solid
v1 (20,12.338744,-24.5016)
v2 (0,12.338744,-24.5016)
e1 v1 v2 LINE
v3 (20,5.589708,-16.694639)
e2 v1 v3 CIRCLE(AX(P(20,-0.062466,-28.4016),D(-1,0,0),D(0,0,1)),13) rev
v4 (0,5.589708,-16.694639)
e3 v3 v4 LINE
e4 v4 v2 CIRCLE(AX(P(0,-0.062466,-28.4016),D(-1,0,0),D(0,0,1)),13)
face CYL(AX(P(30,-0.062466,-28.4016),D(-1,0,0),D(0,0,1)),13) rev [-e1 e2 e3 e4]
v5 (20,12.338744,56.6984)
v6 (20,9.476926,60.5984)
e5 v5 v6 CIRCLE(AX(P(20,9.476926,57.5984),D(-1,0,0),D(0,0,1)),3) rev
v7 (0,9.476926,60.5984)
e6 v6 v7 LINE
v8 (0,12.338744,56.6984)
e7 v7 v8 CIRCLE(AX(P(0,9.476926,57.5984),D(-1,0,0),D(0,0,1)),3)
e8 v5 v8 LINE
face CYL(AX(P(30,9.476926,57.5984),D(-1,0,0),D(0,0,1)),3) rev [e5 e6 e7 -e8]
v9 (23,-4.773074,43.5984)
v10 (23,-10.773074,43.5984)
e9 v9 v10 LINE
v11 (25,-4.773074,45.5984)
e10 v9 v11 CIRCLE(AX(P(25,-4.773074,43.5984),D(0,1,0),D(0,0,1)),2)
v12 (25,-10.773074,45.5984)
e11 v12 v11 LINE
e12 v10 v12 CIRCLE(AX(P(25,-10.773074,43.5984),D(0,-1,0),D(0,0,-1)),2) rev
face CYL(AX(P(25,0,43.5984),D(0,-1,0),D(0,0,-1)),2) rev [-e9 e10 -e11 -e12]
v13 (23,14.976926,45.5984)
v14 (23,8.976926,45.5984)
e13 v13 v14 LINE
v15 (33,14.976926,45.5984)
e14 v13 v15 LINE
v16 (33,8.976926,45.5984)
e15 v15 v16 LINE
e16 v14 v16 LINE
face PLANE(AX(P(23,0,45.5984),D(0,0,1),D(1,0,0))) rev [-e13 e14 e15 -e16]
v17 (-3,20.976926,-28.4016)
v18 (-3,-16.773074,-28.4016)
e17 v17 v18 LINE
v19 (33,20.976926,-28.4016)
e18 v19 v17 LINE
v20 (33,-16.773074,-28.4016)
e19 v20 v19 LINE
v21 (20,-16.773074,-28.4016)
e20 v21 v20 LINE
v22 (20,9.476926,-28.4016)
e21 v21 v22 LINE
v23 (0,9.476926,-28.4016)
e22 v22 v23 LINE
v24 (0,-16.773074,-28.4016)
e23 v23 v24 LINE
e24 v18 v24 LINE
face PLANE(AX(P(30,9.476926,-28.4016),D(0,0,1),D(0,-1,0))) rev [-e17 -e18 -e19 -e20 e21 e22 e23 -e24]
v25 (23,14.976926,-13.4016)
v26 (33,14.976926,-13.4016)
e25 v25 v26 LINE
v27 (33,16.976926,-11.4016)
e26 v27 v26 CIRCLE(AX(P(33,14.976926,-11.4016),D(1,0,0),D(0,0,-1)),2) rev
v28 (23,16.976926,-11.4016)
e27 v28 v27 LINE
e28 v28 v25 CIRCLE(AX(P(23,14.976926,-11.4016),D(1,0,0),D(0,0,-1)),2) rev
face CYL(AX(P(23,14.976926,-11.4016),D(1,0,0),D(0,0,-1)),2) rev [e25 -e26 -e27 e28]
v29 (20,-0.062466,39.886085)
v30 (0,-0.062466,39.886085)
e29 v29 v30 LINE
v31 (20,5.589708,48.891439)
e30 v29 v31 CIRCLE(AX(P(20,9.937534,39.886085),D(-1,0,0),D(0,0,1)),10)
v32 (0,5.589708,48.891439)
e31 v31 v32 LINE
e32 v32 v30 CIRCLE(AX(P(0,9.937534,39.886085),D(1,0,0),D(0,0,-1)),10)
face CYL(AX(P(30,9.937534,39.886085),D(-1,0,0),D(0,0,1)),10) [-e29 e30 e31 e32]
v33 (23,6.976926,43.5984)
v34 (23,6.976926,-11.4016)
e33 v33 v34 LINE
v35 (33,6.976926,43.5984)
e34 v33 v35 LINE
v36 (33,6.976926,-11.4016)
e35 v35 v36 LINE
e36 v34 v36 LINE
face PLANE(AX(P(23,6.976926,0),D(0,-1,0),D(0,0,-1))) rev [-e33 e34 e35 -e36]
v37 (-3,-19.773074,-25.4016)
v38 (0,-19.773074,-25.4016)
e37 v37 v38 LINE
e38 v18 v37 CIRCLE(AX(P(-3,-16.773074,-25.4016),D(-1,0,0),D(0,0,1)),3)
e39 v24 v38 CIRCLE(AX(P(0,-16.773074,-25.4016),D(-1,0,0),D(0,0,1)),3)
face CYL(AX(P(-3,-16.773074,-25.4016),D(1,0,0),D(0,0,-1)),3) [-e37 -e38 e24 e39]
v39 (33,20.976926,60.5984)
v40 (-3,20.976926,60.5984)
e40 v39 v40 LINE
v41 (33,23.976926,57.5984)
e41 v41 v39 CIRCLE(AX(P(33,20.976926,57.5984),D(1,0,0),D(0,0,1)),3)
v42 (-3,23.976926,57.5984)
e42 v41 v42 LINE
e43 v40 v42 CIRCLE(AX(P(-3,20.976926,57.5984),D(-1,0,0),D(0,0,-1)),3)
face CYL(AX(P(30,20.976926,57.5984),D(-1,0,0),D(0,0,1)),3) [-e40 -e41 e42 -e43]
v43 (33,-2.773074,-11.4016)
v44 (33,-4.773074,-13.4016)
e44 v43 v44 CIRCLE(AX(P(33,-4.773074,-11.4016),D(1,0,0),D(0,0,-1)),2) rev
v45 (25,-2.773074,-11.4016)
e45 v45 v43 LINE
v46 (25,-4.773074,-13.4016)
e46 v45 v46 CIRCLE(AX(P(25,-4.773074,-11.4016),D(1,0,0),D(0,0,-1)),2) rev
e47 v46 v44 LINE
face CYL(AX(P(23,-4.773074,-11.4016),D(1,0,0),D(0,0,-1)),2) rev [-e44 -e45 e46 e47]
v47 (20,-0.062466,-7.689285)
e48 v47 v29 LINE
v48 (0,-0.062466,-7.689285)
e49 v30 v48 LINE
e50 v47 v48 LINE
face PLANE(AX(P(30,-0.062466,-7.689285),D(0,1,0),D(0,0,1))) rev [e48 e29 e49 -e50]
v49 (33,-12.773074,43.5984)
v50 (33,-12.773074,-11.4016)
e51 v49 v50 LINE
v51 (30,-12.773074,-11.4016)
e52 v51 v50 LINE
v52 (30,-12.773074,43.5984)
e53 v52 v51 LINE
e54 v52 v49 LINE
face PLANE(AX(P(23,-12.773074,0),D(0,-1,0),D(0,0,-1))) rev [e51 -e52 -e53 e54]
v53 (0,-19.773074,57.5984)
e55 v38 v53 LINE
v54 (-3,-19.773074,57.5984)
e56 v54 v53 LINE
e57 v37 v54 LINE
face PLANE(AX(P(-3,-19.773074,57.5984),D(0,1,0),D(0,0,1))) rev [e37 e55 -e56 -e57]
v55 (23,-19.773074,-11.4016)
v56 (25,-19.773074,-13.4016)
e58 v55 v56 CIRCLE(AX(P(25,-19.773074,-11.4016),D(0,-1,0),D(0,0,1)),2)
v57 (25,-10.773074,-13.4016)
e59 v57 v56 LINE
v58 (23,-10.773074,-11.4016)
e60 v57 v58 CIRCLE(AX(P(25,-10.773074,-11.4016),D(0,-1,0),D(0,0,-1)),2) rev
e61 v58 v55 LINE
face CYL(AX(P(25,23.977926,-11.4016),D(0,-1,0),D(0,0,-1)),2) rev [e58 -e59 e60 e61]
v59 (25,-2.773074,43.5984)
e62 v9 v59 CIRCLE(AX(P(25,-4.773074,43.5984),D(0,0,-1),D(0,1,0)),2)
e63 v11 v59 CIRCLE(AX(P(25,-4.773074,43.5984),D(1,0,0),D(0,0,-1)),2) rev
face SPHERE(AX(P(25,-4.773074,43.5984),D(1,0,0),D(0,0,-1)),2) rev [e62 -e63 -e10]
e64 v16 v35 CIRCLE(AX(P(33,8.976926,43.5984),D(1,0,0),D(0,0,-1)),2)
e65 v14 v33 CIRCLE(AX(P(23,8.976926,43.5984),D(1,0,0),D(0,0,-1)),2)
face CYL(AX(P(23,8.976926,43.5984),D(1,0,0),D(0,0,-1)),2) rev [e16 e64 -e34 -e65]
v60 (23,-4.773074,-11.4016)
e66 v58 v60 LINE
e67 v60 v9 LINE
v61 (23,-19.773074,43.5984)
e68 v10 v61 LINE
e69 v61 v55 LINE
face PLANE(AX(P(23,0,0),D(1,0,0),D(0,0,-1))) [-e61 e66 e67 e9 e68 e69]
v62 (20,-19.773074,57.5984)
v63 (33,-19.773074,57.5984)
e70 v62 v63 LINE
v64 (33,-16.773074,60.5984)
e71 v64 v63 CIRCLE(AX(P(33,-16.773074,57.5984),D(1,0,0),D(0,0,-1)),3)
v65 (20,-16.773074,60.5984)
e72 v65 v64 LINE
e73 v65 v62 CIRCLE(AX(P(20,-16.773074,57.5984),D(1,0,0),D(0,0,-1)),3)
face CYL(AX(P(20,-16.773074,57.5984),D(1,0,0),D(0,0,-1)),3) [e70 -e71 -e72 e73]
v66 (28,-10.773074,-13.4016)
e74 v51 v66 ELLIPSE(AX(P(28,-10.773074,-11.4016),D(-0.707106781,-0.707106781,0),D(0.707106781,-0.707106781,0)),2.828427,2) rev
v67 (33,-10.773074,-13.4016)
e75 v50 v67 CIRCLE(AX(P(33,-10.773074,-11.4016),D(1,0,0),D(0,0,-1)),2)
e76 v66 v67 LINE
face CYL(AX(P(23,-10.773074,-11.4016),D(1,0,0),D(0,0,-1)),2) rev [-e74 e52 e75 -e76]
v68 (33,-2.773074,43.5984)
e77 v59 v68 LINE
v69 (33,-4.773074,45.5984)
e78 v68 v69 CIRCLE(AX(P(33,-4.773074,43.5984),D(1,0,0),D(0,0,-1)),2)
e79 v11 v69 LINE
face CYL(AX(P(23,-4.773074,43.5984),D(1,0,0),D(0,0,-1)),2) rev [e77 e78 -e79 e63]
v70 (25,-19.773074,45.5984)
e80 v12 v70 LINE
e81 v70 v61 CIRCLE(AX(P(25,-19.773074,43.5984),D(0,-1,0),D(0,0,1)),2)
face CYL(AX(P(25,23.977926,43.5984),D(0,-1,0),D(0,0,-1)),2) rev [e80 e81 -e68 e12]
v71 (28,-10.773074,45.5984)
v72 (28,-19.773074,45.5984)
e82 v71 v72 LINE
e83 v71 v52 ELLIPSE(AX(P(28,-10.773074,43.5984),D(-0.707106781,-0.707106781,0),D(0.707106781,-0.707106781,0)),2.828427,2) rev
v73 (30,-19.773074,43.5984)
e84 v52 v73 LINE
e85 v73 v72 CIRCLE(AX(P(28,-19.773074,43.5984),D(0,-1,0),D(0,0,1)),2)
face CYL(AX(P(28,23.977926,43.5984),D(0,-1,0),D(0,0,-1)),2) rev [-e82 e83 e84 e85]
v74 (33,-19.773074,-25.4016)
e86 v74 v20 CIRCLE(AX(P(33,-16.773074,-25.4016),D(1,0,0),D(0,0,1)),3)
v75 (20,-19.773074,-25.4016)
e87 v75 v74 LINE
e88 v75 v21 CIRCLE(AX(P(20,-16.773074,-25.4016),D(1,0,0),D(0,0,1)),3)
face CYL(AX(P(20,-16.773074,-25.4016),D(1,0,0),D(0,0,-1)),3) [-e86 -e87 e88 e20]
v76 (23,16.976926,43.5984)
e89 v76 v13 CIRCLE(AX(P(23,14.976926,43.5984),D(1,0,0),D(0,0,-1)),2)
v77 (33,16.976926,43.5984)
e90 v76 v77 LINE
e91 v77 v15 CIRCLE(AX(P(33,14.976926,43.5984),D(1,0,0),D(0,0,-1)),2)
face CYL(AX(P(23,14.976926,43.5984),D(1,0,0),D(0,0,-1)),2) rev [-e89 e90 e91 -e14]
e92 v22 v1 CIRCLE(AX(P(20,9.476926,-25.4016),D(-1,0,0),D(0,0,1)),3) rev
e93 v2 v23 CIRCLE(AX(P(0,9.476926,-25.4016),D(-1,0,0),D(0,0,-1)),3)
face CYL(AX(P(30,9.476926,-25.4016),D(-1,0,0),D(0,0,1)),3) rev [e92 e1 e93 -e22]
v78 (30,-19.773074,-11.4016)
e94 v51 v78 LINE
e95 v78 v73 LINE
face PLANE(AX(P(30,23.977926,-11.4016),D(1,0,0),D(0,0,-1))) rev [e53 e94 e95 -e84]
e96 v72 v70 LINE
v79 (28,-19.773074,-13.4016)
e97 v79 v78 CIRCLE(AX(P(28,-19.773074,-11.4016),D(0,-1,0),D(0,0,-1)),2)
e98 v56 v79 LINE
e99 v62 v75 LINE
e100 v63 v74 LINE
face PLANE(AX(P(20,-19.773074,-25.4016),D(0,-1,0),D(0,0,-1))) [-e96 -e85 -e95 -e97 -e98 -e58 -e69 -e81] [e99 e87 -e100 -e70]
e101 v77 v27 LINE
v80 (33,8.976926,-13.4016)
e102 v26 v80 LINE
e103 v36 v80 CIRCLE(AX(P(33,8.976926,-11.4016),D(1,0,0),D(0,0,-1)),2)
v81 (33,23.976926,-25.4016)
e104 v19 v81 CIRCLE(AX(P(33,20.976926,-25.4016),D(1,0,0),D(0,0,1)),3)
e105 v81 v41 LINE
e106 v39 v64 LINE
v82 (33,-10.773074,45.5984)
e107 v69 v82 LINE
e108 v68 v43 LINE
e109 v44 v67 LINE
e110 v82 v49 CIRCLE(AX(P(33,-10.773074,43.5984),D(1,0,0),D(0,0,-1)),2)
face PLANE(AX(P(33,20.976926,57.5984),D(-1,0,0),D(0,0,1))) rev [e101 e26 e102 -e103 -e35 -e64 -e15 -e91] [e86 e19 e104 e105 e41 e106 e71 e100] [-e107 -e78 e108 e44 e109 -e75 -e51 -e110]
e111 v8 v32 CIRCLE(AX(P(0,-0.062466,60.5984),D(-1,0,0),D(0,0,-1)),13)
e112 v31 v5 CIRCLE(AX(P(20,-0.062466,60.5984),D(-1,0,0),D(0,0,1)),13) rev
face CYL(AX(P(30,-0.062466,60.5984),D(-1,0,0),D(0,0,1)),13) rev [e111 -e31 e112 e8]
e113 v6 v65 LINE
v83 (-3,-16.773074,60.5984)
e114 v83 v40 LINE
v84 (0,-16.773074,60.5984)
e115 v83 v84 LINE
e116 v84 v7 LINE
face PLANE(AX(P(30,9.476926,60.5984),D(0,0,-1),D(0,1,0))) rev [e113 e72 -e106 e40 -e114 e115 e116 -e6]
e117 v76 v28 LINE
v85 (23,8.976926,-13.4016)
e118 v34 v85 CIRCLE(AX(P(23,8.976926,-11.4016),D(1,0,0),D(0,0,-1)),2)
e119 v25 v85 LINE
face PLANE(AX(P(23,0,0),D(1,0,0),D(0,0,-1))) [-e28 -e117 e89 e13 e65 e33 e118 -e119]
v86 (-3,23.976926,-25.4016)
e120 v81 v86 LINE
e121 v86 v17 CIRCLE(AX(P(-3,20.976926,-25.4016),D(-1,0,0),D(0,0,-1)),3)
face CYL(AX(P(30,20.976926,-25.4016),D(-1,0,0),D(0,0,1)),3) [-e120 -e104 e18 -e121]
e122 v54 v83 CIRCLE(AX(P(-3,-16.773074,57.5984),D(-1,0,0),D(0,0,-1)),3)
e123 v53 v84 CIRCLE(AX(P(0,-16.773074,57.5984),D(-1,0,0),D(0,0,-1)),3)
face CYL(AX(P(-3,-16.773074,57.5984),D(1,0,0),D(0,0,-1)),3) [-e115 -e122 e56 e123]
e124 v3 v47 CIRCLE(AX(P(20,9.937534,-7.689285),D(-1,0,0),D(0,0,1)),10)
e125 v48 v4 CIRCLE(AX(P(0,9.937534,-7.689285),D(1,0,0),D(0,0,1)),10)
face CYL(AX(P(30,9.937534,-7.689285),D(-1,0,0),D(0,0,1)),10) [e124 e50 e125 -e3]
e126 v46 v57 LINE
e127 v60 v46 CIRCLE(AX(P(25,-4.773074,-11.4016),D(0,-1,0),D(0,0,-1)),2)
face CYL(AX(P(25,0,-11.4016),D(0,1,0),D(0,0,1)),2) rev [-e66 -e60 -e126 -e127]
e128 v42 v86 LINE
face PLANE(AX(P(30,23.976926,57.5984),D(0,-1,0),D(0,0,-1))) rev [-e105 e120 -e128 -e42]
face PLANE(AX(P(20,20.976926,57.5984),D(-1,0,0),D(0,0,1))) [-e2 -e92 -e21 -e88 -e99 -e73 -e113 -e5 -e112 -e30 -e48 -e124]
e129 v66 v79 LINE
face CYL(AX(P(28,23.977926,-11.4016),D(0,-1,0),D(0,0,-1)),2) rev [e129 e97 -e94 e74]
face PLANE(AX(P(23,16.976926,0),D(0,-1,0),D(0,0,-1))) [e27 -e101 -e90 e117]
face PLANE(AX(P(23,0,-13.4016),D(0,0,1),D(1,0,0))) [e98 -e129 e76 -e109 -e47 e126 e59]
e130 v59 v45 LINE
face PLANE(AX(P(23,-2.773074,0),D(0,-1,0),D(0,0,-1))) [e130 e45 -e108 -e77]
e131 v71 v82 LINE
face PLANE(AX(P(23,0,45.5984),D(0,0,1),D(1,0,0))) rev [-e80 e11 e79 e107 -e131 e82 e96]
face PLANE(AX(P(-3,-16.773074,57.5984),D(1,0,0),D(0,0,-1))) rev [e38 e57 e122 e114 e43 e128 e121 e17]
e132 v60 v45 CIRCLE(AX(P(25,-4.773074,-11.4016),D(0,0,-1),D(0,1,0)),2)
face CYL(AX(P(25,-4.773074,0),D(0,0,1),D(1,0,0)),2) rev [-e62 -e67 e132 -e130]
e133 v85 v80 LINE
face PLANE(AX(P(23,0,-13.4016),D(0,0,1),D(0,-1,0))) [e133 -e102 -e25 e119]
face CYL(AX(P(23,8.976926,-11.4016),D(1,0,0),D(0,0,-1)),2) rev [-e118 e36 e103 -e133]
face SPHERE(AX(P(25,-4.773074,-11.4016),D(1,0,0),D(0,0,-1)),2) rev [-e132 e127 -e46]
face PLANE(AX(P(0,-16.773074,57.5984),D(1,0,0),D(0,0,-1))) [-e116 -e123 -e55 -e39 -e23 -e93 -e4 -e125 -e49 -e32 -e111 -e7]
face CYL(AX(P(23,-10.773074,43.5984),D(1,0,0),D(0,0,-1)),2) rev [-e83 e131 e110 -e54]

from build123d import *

# Parameters (mm, degrees)
RESSALTO_EXTRUS_O2_DEPTH      = 30
RESSALTO_EXTRUS_O3_START      = 3
RESSALTO_EXTRUS_O3_DEPTH      = 3
RESSALTO_EXTRUS_O4_DEPTH      = 3
RESSALTO_EXTRUS_O4_DEPTH_BACK = 10
CORTE_EXTRUS_O1_DEPTH         = 10.000000000000002
CORTE_EXTRUS_O2_REACH         = 83.702
FILETE1_R                     = 2


with BuildPart() as part:
    # Esboço2 → Ressalto-extrusão2 (new body)
    with BuildSketch(Plane(origin=(0, 0, 0), x_dir=(0, 0, -1), z_dir=(1, 0, 0))):
        with BuildLine():
            Line((2.901599919865161, -0.06246593766177921), (-35.09840008013481, -0.06246593766176534))
            Line((-35.09840008013481, -0.06246593766176534), (-39.886084902926825, -0.06246593766177921))
            ThreePointArc((-39.886084902926825, -0.06246593766177921), (-45.20218023363878, 1.4676385237390175), (-48.891439327799866, 5.589707975381692))
            ThreePointArc((-48.891439327799866, 5.589707975381692), (-52.09653694789475, 9.772081498832542), (-56.69840008013493, 12.338743680758546))
            ThreePointArc((-56.69840008013493, 12.338743680758546), (-59.37322401506481, 11.895603400997262), (-60.5984000801349, 9.476926076507686))
            Line((-60.5984000801349, 9.476926076507686), (-60.598400080134894, 20.976926076507663))
            ThreePointArc((-60.598400080134894, 20.976926076507663), (-59.71972042369454, 23.098246420067323), (-57.59840008013488, 23.976926076507684))
            Line((-57.59840008013488, 23.976926076507684), (25.401599919865156, 23.976926076507684))
            ThreePointArc((25.401599919865156, 23.976926076507684), (27.522920263424812, 23.098246420067333), (28.401599919865177, 20.976926076507684))
            Line((28.401599919865177, 20.976926076507684), (28.40159991986526, 9.476926076507686))
            ThreePointArc((28.40159991986526, 9.476926076507686), (27.176423854795164, 11.895603400997262), (24.50159991986529, 12.338743680758546))
            ThreePointArc((24.50159991986529, 12.338743680758546), (19.8997367876251, 9.772081498832549), (16.69463916753021, 5.589707975381692))
            ThreePointArc((16.69463916753021, 5.589707975381692), (13.005380073369123, 1.467638523739021), (7.689284742657176, -0.06246593766177921))
            Line((7.689284742657176, -0.06246593766177921), (2.901599919865161, -0.06246593766177921))
        make_face()
    extrude(amount=RESSALTO_EXTRUS_O2_DEPTH)

    # Esboço3 → Ressalto-extrusão3 (add)
    with BuildSketch(Plane.ZY.offset(RESSALTO_EXTRUS_O3_START)):
        with BuildLine():
            Line((60.598400080134894, 15.226926076507677), (60.59840008013489, 20.976926076507663))
            ThreePointArc((60.59840008013489, 20.976926076507663), (59.71972042369454, 23.098246420067326), (57.59840008013487, 23.976926076507684))
            Line((57.59840008013487, 23.976926076507684), (16.09840008013486, 23.976926076507684))
            Line((16.09840008013486, 23.976926076507684), (-25.4015999198652, 23.976926076507684))
            ThreePointArc((-25.4015999198652, 23.976926076507684), (-27.52292026342486, 23.098246420067326), (-28.40159991986522, 20.976926076507663))
            Line((-28.40159991986522, 20.976926076507663), (-28.40159991986522, 15.226926076507686))
            Line((-28.40159991986522, 15.226926076507686), (-28.40159991986525, -16.773073923492294))
            ThreePointArc((-28.40159991986525, -16.773073923492294), (-27.522920263424897, -18.894394267051958), (-25.401599919865234, -19.77307392349232))
            Line((-25.401599919865234, -19.77307392349232), (57.59840008013488, -19.773073923492326))
            ThreePointArc((57.59840008013488, -19.773073923492326), (59.71972042369455, -18.89439426705197), (60.5984000801349, -16.7730739234923))
            Line((60.5984000801349, -16.7730739234923), (60.598400080134894, 15.226926076507677))
        make_face()
    extrude(amount=-RESSALTO_EXTRUS_O3_DEPTH)

    # Esboço4 → Ressalto-extrusão4 (add, two sides: drawn at the far end of the back side and taken through both)
    with BuildSketch(Plane(origin=(30, 0, 0), x_dir=(0, 0, -1), z_dir=(1, 0, 0)).offset(-RESSALTO_EXTRUS_O4_DEPTH_BACK)):
        with BuildLine():
            Line((-16.09840008013486, 23.976926076507684), (25.4015999198652, 23.976926076507684))
            ThreePointArc((25.4015999198652, 23.976926076507684), (27.52292026342486, 23.098246420067326), (28.40159991986522, 20.976926076507663))
            Line((28.40159991986522, 20.976926076507663), (28.40159991986522, 15.226926076507686))
            Line((28.40159991986522, 15.226926076507686), (28.40159991986523, -16.773073923492294))
            ThreePointArc((28.40159991986523, -16.773073923492294), (27.522920263424872, -18.89439426705196), (25.401599919865205, -19.77307392349232))
            Line((25.401599919865205, -19.77307392349232), (-57.598400080134866, -19.773073923492326))
            ThreePointArc((-57.598400080134866, -19.773073923492326), (-59.71972042369453, -18.89439426705197), (-60.59840008013489, -16.773073923492305))
            Line((-60.59840008013489, -16.773073923492305), (-60.598400080134894, 15.226926076507677))
            Line((-60.598400080134894, 15.226926076507677), (-60.598400080134894, 20.976926076507663))
            ThreePointArc((-60.598400080134894, 20.976926076507663), (-59.71972042369454, 23.098246420067326), (-57.59840008013487, 23.976926076507684))
            Line((-57.59840008013487, 23.976926076507684), (-16.09840008013486, 23.976926076507684))
        make_face()
    extrude(amount=RESSALTO_EXTRUS_O4_DEPTH + RESSALTO_EXTRUS_O4_DEPTH_BACK)

    # Esboço8 → Corte-extrusão1 (cut)
    with BuildSketch(Plane(origin=(33, 0, 0), x_dir=(0, 0, -1), z_dir=(1, 0, 0))):
        with BuildLine():
            Line((-43.59840008013488, -2.7730739234923267), (11.401599919865212, -2.7730739234923267))
            ThreePointArc((11.401599919865212, -2.7730739234923267), (12.815813482238323, -3.3588603611192323), (13.401599919865227, -4.7730739234923405))
            Line((13.401599919865227, -4.7730739234923405), (13.401599919865227, -10.773073923492314))
            ThreePointArc((13.401599919865227, -10.773073923492314), (12.81581348223832, -12.187287485865422), (11.401599919865212, -12.773073923492326))
            Line((11.401599919865212, -12.773073923492326), (-43.59840008013488, -12.773073923492326))
            ThreePointArc((-43.59840008013488, -12.773073923492326), (-45.012613642507986, -12.187287485865422), (-45.598400080134894, -10.773073923492314))
            Line((-45.598400080134894, -10.773073923492314), (-45.598400080134894, -4.7730739234923405))
            ThreePointArc((-45.598400080134894, -4.7730739234923405), (-45.012613642507986, -3.358860361119232), (-43.59840008013488, -2.7730739234923267))
        make_face()
        with BuildLine():
            Line((-43.59840008013488, 6.976926076507685), (11.401599919865218, 6.976926076507685))
            ThreePointArc((11.401599919865218, 6.976926076507685), (12.815813482238326, 7.56271251413459), (13.401599919865228, 8.976926076507699))
            Line((13.401599919865228, 8.976926076507699), (13.401599919865227, 14.976926076507674))
            ThreePointArc((13.401599919865227, 14.976926076507674), (12.81581348223832, 16.39113963888078), (11.401599919865214, 16.976926076507684))
            Line((11.401599919865214, 16.976926076507684), (-43.59840008013488, 16.976926076507684))
            ThreePointArc((-43.59840008013488, 16.976926076507684), (-45.012613642507986, 16.39113963888078), (-45.598400080134894, 14.976926076507672))
            Line((-45.598400080134894, 14.976926076507672), (-45.598400080134894, 8.976926076507699))
            ThreePointArc((-45.598400080134894, 8.976926076507699), (-45.012613642507986, 7.5627125141345894), (-43.59840008013488, 6.976926076507685))
        make_face()
    extrude(amount=-CORTE_EXTRUS_O1_DEPTH, mode=Mode.SUBTRACT)

    # Esboço9 → Corte-extrusão2 (cut, up to next)
    with BuildSketch(Plane(origin=(0, -19.773073923492323, -1.65e-15), x_dir=(-1, 0, 0), z_dir=(0, -1, -8e-17)), mode=Mode.PRIVATE) as corte_extrus_o2_sk1:
        with BuildLine():
            Line((-25.000000000000007, 13.401599919865228), (-27.99999999999999, 13.401599919865228))
            ThreePointArc((-27.99999999999999, 13.401599919865228), (-29.414213562373096, 12.815813482238323), (-30.000000000000004, 11.401599919865216))
            Line((-30.000000000000004, 11.401599919865216), (-29.999999999999996, -43.59840008013487))
            ThreePointArc((-29.999999999999996, -43.59840008013487), (-29.414213562373092, -45.01261364250798), (-27.999999999999982, -45.59840008013489))
            Line((-27.999999999999982, -45.59840008013489), (-25, -45.59840008013489))
            ThreePointArc((-25, -45.59840008013489), (-23.585786437626894, -45.01261364250798), (-22.99999999999999, -43.59840008013487))
            Line((-22.99999999999999, -43.59840008013487), (-22.999999999999996, 11.401599919865216))
            ThreePointArc((-22.999999999999996, 11.401599919865216), (-23.585786437626897, 12.815813482238324), (-25.000000000000007, 13.401599919865228))
        make_face()
    corte_extrus_o2_tool1 = extrude(corte_extrus_o2_sk1.sketch, amount=-CORTE_EXTRUS_O2_REACH, mode=Mode.PRIVATE) & part.part
    add(corte_extrus_o2_tool1.solids().sort_by_distance((26.5, -19.773074, 16.0984))[0], mode=Mode.SUBTRACT)

    # Filete1
    # the kernel refuses this fillet: 2 mm, written as the material it adds along each edge
    with BuildSketch(Plane(origin=(22.99999999999999, -15.773073923492316, 45.59840008013489), x_dir=(0, 0, -1), z_dir=(0, 1, 0))) as filete1_piece_1:
        with BuildLine():
            CenterArc((FILETE1_R, -FILETE1_R), FILETE1_R, 90, 90)
            Line((0, -FILETE1_R), (0, 0))
            Line((0, 0), (FILETE1_R, 0))
        make_face()
    extrude(amount=10.999999999999973)
    with BuildSketch(Plane(origin=(23, -4.773073923492332, 43.59840008013489), x_dir=(0, -4.44e-15, 1), z_dir=(0, -1, -4.44e-15))) as filete1_piece_2:
        with BuildLine():
            CenterArc((2.000000000000007 - FILETE1_R, -FILETE1_R), FILETE1_R, 359.9999999999997, 90.00000000000028)
            Line((2.000000000000007, -FILETE1_R), (2.000000000000007, 0))
            Line((2.000000000000007, 0), (2.000000000000007 - FILETE1_R, 1.066e-14))
        make_face()
    revolve(axis=Axis((23, -4.773073923492332, 43.59840008013489), (-1, 0, 0)), revolution_arc=90.00000000000045)
    with BuildSketch(Plane(origin=(23, -2.7730739234923267, 43.59840008013488), x_dir=(-5.33e-15, -1, 0), z_dir=(0, 0, -1))) as filete1_piece_3:
        with BuildLine():
            CenterArc((FILETE1_R, -FILETE1_R), FILETE1_R, 89.99999999999969, 90.00000000000031)
            Line((-1.11e-14, -FILETE1_R), (0, 0))
            Line((0, 0), (FILETE1_R, 0))
        make_face()
    extrude(amount=55.00000000000009)
    with BuildSketch(Plane(origin=(23, -4.773073923492328, -11.401599919865227), x_dir=(0, 1, 7.11e-15), z_dir=(0, -7.11e-15, 1))) as filete1_piece_4:
        with BuildLine():
            CenterArc((2.0000000000000004 - FILETE1_R, -FILETE1_R), FILETE1_R, 359.9999999999999, 90.00000000000011)
            Line((2.0000000000000018, -FILETE1_R), (2.0000000000000004, 0))
            Line((2.0000000000000004, 0), (2.0000000000000004 - FILETE1_R, 3.55e-15))
        make_face()
    revolve(axis=Axis((23, -4.773073923492328, -11.401599919865227), (-1, 0, 0)), revolution_arc=90.00000000000077)
    with BuildSketch(Plane(origin=(23, -4.7730739234923405, -13.401599919865227), x_dir=(-1.78e-15, 0, 1), z_dir=(0, -1, 0))) as filete1_piece_5:
        with BuildLine():
            CenterArc((FILETE1_R, -FILETE1_R), FILETE1_R, 89.9999999999999, 90.0000000000001)
            Line((-3.55e-15, -FILETE1_R), (0, 0))
            Line((0, 0), (FILETE1_R, 0))
        make_face()
    extrude(amount=10.999999999999973)


solid = part.part
